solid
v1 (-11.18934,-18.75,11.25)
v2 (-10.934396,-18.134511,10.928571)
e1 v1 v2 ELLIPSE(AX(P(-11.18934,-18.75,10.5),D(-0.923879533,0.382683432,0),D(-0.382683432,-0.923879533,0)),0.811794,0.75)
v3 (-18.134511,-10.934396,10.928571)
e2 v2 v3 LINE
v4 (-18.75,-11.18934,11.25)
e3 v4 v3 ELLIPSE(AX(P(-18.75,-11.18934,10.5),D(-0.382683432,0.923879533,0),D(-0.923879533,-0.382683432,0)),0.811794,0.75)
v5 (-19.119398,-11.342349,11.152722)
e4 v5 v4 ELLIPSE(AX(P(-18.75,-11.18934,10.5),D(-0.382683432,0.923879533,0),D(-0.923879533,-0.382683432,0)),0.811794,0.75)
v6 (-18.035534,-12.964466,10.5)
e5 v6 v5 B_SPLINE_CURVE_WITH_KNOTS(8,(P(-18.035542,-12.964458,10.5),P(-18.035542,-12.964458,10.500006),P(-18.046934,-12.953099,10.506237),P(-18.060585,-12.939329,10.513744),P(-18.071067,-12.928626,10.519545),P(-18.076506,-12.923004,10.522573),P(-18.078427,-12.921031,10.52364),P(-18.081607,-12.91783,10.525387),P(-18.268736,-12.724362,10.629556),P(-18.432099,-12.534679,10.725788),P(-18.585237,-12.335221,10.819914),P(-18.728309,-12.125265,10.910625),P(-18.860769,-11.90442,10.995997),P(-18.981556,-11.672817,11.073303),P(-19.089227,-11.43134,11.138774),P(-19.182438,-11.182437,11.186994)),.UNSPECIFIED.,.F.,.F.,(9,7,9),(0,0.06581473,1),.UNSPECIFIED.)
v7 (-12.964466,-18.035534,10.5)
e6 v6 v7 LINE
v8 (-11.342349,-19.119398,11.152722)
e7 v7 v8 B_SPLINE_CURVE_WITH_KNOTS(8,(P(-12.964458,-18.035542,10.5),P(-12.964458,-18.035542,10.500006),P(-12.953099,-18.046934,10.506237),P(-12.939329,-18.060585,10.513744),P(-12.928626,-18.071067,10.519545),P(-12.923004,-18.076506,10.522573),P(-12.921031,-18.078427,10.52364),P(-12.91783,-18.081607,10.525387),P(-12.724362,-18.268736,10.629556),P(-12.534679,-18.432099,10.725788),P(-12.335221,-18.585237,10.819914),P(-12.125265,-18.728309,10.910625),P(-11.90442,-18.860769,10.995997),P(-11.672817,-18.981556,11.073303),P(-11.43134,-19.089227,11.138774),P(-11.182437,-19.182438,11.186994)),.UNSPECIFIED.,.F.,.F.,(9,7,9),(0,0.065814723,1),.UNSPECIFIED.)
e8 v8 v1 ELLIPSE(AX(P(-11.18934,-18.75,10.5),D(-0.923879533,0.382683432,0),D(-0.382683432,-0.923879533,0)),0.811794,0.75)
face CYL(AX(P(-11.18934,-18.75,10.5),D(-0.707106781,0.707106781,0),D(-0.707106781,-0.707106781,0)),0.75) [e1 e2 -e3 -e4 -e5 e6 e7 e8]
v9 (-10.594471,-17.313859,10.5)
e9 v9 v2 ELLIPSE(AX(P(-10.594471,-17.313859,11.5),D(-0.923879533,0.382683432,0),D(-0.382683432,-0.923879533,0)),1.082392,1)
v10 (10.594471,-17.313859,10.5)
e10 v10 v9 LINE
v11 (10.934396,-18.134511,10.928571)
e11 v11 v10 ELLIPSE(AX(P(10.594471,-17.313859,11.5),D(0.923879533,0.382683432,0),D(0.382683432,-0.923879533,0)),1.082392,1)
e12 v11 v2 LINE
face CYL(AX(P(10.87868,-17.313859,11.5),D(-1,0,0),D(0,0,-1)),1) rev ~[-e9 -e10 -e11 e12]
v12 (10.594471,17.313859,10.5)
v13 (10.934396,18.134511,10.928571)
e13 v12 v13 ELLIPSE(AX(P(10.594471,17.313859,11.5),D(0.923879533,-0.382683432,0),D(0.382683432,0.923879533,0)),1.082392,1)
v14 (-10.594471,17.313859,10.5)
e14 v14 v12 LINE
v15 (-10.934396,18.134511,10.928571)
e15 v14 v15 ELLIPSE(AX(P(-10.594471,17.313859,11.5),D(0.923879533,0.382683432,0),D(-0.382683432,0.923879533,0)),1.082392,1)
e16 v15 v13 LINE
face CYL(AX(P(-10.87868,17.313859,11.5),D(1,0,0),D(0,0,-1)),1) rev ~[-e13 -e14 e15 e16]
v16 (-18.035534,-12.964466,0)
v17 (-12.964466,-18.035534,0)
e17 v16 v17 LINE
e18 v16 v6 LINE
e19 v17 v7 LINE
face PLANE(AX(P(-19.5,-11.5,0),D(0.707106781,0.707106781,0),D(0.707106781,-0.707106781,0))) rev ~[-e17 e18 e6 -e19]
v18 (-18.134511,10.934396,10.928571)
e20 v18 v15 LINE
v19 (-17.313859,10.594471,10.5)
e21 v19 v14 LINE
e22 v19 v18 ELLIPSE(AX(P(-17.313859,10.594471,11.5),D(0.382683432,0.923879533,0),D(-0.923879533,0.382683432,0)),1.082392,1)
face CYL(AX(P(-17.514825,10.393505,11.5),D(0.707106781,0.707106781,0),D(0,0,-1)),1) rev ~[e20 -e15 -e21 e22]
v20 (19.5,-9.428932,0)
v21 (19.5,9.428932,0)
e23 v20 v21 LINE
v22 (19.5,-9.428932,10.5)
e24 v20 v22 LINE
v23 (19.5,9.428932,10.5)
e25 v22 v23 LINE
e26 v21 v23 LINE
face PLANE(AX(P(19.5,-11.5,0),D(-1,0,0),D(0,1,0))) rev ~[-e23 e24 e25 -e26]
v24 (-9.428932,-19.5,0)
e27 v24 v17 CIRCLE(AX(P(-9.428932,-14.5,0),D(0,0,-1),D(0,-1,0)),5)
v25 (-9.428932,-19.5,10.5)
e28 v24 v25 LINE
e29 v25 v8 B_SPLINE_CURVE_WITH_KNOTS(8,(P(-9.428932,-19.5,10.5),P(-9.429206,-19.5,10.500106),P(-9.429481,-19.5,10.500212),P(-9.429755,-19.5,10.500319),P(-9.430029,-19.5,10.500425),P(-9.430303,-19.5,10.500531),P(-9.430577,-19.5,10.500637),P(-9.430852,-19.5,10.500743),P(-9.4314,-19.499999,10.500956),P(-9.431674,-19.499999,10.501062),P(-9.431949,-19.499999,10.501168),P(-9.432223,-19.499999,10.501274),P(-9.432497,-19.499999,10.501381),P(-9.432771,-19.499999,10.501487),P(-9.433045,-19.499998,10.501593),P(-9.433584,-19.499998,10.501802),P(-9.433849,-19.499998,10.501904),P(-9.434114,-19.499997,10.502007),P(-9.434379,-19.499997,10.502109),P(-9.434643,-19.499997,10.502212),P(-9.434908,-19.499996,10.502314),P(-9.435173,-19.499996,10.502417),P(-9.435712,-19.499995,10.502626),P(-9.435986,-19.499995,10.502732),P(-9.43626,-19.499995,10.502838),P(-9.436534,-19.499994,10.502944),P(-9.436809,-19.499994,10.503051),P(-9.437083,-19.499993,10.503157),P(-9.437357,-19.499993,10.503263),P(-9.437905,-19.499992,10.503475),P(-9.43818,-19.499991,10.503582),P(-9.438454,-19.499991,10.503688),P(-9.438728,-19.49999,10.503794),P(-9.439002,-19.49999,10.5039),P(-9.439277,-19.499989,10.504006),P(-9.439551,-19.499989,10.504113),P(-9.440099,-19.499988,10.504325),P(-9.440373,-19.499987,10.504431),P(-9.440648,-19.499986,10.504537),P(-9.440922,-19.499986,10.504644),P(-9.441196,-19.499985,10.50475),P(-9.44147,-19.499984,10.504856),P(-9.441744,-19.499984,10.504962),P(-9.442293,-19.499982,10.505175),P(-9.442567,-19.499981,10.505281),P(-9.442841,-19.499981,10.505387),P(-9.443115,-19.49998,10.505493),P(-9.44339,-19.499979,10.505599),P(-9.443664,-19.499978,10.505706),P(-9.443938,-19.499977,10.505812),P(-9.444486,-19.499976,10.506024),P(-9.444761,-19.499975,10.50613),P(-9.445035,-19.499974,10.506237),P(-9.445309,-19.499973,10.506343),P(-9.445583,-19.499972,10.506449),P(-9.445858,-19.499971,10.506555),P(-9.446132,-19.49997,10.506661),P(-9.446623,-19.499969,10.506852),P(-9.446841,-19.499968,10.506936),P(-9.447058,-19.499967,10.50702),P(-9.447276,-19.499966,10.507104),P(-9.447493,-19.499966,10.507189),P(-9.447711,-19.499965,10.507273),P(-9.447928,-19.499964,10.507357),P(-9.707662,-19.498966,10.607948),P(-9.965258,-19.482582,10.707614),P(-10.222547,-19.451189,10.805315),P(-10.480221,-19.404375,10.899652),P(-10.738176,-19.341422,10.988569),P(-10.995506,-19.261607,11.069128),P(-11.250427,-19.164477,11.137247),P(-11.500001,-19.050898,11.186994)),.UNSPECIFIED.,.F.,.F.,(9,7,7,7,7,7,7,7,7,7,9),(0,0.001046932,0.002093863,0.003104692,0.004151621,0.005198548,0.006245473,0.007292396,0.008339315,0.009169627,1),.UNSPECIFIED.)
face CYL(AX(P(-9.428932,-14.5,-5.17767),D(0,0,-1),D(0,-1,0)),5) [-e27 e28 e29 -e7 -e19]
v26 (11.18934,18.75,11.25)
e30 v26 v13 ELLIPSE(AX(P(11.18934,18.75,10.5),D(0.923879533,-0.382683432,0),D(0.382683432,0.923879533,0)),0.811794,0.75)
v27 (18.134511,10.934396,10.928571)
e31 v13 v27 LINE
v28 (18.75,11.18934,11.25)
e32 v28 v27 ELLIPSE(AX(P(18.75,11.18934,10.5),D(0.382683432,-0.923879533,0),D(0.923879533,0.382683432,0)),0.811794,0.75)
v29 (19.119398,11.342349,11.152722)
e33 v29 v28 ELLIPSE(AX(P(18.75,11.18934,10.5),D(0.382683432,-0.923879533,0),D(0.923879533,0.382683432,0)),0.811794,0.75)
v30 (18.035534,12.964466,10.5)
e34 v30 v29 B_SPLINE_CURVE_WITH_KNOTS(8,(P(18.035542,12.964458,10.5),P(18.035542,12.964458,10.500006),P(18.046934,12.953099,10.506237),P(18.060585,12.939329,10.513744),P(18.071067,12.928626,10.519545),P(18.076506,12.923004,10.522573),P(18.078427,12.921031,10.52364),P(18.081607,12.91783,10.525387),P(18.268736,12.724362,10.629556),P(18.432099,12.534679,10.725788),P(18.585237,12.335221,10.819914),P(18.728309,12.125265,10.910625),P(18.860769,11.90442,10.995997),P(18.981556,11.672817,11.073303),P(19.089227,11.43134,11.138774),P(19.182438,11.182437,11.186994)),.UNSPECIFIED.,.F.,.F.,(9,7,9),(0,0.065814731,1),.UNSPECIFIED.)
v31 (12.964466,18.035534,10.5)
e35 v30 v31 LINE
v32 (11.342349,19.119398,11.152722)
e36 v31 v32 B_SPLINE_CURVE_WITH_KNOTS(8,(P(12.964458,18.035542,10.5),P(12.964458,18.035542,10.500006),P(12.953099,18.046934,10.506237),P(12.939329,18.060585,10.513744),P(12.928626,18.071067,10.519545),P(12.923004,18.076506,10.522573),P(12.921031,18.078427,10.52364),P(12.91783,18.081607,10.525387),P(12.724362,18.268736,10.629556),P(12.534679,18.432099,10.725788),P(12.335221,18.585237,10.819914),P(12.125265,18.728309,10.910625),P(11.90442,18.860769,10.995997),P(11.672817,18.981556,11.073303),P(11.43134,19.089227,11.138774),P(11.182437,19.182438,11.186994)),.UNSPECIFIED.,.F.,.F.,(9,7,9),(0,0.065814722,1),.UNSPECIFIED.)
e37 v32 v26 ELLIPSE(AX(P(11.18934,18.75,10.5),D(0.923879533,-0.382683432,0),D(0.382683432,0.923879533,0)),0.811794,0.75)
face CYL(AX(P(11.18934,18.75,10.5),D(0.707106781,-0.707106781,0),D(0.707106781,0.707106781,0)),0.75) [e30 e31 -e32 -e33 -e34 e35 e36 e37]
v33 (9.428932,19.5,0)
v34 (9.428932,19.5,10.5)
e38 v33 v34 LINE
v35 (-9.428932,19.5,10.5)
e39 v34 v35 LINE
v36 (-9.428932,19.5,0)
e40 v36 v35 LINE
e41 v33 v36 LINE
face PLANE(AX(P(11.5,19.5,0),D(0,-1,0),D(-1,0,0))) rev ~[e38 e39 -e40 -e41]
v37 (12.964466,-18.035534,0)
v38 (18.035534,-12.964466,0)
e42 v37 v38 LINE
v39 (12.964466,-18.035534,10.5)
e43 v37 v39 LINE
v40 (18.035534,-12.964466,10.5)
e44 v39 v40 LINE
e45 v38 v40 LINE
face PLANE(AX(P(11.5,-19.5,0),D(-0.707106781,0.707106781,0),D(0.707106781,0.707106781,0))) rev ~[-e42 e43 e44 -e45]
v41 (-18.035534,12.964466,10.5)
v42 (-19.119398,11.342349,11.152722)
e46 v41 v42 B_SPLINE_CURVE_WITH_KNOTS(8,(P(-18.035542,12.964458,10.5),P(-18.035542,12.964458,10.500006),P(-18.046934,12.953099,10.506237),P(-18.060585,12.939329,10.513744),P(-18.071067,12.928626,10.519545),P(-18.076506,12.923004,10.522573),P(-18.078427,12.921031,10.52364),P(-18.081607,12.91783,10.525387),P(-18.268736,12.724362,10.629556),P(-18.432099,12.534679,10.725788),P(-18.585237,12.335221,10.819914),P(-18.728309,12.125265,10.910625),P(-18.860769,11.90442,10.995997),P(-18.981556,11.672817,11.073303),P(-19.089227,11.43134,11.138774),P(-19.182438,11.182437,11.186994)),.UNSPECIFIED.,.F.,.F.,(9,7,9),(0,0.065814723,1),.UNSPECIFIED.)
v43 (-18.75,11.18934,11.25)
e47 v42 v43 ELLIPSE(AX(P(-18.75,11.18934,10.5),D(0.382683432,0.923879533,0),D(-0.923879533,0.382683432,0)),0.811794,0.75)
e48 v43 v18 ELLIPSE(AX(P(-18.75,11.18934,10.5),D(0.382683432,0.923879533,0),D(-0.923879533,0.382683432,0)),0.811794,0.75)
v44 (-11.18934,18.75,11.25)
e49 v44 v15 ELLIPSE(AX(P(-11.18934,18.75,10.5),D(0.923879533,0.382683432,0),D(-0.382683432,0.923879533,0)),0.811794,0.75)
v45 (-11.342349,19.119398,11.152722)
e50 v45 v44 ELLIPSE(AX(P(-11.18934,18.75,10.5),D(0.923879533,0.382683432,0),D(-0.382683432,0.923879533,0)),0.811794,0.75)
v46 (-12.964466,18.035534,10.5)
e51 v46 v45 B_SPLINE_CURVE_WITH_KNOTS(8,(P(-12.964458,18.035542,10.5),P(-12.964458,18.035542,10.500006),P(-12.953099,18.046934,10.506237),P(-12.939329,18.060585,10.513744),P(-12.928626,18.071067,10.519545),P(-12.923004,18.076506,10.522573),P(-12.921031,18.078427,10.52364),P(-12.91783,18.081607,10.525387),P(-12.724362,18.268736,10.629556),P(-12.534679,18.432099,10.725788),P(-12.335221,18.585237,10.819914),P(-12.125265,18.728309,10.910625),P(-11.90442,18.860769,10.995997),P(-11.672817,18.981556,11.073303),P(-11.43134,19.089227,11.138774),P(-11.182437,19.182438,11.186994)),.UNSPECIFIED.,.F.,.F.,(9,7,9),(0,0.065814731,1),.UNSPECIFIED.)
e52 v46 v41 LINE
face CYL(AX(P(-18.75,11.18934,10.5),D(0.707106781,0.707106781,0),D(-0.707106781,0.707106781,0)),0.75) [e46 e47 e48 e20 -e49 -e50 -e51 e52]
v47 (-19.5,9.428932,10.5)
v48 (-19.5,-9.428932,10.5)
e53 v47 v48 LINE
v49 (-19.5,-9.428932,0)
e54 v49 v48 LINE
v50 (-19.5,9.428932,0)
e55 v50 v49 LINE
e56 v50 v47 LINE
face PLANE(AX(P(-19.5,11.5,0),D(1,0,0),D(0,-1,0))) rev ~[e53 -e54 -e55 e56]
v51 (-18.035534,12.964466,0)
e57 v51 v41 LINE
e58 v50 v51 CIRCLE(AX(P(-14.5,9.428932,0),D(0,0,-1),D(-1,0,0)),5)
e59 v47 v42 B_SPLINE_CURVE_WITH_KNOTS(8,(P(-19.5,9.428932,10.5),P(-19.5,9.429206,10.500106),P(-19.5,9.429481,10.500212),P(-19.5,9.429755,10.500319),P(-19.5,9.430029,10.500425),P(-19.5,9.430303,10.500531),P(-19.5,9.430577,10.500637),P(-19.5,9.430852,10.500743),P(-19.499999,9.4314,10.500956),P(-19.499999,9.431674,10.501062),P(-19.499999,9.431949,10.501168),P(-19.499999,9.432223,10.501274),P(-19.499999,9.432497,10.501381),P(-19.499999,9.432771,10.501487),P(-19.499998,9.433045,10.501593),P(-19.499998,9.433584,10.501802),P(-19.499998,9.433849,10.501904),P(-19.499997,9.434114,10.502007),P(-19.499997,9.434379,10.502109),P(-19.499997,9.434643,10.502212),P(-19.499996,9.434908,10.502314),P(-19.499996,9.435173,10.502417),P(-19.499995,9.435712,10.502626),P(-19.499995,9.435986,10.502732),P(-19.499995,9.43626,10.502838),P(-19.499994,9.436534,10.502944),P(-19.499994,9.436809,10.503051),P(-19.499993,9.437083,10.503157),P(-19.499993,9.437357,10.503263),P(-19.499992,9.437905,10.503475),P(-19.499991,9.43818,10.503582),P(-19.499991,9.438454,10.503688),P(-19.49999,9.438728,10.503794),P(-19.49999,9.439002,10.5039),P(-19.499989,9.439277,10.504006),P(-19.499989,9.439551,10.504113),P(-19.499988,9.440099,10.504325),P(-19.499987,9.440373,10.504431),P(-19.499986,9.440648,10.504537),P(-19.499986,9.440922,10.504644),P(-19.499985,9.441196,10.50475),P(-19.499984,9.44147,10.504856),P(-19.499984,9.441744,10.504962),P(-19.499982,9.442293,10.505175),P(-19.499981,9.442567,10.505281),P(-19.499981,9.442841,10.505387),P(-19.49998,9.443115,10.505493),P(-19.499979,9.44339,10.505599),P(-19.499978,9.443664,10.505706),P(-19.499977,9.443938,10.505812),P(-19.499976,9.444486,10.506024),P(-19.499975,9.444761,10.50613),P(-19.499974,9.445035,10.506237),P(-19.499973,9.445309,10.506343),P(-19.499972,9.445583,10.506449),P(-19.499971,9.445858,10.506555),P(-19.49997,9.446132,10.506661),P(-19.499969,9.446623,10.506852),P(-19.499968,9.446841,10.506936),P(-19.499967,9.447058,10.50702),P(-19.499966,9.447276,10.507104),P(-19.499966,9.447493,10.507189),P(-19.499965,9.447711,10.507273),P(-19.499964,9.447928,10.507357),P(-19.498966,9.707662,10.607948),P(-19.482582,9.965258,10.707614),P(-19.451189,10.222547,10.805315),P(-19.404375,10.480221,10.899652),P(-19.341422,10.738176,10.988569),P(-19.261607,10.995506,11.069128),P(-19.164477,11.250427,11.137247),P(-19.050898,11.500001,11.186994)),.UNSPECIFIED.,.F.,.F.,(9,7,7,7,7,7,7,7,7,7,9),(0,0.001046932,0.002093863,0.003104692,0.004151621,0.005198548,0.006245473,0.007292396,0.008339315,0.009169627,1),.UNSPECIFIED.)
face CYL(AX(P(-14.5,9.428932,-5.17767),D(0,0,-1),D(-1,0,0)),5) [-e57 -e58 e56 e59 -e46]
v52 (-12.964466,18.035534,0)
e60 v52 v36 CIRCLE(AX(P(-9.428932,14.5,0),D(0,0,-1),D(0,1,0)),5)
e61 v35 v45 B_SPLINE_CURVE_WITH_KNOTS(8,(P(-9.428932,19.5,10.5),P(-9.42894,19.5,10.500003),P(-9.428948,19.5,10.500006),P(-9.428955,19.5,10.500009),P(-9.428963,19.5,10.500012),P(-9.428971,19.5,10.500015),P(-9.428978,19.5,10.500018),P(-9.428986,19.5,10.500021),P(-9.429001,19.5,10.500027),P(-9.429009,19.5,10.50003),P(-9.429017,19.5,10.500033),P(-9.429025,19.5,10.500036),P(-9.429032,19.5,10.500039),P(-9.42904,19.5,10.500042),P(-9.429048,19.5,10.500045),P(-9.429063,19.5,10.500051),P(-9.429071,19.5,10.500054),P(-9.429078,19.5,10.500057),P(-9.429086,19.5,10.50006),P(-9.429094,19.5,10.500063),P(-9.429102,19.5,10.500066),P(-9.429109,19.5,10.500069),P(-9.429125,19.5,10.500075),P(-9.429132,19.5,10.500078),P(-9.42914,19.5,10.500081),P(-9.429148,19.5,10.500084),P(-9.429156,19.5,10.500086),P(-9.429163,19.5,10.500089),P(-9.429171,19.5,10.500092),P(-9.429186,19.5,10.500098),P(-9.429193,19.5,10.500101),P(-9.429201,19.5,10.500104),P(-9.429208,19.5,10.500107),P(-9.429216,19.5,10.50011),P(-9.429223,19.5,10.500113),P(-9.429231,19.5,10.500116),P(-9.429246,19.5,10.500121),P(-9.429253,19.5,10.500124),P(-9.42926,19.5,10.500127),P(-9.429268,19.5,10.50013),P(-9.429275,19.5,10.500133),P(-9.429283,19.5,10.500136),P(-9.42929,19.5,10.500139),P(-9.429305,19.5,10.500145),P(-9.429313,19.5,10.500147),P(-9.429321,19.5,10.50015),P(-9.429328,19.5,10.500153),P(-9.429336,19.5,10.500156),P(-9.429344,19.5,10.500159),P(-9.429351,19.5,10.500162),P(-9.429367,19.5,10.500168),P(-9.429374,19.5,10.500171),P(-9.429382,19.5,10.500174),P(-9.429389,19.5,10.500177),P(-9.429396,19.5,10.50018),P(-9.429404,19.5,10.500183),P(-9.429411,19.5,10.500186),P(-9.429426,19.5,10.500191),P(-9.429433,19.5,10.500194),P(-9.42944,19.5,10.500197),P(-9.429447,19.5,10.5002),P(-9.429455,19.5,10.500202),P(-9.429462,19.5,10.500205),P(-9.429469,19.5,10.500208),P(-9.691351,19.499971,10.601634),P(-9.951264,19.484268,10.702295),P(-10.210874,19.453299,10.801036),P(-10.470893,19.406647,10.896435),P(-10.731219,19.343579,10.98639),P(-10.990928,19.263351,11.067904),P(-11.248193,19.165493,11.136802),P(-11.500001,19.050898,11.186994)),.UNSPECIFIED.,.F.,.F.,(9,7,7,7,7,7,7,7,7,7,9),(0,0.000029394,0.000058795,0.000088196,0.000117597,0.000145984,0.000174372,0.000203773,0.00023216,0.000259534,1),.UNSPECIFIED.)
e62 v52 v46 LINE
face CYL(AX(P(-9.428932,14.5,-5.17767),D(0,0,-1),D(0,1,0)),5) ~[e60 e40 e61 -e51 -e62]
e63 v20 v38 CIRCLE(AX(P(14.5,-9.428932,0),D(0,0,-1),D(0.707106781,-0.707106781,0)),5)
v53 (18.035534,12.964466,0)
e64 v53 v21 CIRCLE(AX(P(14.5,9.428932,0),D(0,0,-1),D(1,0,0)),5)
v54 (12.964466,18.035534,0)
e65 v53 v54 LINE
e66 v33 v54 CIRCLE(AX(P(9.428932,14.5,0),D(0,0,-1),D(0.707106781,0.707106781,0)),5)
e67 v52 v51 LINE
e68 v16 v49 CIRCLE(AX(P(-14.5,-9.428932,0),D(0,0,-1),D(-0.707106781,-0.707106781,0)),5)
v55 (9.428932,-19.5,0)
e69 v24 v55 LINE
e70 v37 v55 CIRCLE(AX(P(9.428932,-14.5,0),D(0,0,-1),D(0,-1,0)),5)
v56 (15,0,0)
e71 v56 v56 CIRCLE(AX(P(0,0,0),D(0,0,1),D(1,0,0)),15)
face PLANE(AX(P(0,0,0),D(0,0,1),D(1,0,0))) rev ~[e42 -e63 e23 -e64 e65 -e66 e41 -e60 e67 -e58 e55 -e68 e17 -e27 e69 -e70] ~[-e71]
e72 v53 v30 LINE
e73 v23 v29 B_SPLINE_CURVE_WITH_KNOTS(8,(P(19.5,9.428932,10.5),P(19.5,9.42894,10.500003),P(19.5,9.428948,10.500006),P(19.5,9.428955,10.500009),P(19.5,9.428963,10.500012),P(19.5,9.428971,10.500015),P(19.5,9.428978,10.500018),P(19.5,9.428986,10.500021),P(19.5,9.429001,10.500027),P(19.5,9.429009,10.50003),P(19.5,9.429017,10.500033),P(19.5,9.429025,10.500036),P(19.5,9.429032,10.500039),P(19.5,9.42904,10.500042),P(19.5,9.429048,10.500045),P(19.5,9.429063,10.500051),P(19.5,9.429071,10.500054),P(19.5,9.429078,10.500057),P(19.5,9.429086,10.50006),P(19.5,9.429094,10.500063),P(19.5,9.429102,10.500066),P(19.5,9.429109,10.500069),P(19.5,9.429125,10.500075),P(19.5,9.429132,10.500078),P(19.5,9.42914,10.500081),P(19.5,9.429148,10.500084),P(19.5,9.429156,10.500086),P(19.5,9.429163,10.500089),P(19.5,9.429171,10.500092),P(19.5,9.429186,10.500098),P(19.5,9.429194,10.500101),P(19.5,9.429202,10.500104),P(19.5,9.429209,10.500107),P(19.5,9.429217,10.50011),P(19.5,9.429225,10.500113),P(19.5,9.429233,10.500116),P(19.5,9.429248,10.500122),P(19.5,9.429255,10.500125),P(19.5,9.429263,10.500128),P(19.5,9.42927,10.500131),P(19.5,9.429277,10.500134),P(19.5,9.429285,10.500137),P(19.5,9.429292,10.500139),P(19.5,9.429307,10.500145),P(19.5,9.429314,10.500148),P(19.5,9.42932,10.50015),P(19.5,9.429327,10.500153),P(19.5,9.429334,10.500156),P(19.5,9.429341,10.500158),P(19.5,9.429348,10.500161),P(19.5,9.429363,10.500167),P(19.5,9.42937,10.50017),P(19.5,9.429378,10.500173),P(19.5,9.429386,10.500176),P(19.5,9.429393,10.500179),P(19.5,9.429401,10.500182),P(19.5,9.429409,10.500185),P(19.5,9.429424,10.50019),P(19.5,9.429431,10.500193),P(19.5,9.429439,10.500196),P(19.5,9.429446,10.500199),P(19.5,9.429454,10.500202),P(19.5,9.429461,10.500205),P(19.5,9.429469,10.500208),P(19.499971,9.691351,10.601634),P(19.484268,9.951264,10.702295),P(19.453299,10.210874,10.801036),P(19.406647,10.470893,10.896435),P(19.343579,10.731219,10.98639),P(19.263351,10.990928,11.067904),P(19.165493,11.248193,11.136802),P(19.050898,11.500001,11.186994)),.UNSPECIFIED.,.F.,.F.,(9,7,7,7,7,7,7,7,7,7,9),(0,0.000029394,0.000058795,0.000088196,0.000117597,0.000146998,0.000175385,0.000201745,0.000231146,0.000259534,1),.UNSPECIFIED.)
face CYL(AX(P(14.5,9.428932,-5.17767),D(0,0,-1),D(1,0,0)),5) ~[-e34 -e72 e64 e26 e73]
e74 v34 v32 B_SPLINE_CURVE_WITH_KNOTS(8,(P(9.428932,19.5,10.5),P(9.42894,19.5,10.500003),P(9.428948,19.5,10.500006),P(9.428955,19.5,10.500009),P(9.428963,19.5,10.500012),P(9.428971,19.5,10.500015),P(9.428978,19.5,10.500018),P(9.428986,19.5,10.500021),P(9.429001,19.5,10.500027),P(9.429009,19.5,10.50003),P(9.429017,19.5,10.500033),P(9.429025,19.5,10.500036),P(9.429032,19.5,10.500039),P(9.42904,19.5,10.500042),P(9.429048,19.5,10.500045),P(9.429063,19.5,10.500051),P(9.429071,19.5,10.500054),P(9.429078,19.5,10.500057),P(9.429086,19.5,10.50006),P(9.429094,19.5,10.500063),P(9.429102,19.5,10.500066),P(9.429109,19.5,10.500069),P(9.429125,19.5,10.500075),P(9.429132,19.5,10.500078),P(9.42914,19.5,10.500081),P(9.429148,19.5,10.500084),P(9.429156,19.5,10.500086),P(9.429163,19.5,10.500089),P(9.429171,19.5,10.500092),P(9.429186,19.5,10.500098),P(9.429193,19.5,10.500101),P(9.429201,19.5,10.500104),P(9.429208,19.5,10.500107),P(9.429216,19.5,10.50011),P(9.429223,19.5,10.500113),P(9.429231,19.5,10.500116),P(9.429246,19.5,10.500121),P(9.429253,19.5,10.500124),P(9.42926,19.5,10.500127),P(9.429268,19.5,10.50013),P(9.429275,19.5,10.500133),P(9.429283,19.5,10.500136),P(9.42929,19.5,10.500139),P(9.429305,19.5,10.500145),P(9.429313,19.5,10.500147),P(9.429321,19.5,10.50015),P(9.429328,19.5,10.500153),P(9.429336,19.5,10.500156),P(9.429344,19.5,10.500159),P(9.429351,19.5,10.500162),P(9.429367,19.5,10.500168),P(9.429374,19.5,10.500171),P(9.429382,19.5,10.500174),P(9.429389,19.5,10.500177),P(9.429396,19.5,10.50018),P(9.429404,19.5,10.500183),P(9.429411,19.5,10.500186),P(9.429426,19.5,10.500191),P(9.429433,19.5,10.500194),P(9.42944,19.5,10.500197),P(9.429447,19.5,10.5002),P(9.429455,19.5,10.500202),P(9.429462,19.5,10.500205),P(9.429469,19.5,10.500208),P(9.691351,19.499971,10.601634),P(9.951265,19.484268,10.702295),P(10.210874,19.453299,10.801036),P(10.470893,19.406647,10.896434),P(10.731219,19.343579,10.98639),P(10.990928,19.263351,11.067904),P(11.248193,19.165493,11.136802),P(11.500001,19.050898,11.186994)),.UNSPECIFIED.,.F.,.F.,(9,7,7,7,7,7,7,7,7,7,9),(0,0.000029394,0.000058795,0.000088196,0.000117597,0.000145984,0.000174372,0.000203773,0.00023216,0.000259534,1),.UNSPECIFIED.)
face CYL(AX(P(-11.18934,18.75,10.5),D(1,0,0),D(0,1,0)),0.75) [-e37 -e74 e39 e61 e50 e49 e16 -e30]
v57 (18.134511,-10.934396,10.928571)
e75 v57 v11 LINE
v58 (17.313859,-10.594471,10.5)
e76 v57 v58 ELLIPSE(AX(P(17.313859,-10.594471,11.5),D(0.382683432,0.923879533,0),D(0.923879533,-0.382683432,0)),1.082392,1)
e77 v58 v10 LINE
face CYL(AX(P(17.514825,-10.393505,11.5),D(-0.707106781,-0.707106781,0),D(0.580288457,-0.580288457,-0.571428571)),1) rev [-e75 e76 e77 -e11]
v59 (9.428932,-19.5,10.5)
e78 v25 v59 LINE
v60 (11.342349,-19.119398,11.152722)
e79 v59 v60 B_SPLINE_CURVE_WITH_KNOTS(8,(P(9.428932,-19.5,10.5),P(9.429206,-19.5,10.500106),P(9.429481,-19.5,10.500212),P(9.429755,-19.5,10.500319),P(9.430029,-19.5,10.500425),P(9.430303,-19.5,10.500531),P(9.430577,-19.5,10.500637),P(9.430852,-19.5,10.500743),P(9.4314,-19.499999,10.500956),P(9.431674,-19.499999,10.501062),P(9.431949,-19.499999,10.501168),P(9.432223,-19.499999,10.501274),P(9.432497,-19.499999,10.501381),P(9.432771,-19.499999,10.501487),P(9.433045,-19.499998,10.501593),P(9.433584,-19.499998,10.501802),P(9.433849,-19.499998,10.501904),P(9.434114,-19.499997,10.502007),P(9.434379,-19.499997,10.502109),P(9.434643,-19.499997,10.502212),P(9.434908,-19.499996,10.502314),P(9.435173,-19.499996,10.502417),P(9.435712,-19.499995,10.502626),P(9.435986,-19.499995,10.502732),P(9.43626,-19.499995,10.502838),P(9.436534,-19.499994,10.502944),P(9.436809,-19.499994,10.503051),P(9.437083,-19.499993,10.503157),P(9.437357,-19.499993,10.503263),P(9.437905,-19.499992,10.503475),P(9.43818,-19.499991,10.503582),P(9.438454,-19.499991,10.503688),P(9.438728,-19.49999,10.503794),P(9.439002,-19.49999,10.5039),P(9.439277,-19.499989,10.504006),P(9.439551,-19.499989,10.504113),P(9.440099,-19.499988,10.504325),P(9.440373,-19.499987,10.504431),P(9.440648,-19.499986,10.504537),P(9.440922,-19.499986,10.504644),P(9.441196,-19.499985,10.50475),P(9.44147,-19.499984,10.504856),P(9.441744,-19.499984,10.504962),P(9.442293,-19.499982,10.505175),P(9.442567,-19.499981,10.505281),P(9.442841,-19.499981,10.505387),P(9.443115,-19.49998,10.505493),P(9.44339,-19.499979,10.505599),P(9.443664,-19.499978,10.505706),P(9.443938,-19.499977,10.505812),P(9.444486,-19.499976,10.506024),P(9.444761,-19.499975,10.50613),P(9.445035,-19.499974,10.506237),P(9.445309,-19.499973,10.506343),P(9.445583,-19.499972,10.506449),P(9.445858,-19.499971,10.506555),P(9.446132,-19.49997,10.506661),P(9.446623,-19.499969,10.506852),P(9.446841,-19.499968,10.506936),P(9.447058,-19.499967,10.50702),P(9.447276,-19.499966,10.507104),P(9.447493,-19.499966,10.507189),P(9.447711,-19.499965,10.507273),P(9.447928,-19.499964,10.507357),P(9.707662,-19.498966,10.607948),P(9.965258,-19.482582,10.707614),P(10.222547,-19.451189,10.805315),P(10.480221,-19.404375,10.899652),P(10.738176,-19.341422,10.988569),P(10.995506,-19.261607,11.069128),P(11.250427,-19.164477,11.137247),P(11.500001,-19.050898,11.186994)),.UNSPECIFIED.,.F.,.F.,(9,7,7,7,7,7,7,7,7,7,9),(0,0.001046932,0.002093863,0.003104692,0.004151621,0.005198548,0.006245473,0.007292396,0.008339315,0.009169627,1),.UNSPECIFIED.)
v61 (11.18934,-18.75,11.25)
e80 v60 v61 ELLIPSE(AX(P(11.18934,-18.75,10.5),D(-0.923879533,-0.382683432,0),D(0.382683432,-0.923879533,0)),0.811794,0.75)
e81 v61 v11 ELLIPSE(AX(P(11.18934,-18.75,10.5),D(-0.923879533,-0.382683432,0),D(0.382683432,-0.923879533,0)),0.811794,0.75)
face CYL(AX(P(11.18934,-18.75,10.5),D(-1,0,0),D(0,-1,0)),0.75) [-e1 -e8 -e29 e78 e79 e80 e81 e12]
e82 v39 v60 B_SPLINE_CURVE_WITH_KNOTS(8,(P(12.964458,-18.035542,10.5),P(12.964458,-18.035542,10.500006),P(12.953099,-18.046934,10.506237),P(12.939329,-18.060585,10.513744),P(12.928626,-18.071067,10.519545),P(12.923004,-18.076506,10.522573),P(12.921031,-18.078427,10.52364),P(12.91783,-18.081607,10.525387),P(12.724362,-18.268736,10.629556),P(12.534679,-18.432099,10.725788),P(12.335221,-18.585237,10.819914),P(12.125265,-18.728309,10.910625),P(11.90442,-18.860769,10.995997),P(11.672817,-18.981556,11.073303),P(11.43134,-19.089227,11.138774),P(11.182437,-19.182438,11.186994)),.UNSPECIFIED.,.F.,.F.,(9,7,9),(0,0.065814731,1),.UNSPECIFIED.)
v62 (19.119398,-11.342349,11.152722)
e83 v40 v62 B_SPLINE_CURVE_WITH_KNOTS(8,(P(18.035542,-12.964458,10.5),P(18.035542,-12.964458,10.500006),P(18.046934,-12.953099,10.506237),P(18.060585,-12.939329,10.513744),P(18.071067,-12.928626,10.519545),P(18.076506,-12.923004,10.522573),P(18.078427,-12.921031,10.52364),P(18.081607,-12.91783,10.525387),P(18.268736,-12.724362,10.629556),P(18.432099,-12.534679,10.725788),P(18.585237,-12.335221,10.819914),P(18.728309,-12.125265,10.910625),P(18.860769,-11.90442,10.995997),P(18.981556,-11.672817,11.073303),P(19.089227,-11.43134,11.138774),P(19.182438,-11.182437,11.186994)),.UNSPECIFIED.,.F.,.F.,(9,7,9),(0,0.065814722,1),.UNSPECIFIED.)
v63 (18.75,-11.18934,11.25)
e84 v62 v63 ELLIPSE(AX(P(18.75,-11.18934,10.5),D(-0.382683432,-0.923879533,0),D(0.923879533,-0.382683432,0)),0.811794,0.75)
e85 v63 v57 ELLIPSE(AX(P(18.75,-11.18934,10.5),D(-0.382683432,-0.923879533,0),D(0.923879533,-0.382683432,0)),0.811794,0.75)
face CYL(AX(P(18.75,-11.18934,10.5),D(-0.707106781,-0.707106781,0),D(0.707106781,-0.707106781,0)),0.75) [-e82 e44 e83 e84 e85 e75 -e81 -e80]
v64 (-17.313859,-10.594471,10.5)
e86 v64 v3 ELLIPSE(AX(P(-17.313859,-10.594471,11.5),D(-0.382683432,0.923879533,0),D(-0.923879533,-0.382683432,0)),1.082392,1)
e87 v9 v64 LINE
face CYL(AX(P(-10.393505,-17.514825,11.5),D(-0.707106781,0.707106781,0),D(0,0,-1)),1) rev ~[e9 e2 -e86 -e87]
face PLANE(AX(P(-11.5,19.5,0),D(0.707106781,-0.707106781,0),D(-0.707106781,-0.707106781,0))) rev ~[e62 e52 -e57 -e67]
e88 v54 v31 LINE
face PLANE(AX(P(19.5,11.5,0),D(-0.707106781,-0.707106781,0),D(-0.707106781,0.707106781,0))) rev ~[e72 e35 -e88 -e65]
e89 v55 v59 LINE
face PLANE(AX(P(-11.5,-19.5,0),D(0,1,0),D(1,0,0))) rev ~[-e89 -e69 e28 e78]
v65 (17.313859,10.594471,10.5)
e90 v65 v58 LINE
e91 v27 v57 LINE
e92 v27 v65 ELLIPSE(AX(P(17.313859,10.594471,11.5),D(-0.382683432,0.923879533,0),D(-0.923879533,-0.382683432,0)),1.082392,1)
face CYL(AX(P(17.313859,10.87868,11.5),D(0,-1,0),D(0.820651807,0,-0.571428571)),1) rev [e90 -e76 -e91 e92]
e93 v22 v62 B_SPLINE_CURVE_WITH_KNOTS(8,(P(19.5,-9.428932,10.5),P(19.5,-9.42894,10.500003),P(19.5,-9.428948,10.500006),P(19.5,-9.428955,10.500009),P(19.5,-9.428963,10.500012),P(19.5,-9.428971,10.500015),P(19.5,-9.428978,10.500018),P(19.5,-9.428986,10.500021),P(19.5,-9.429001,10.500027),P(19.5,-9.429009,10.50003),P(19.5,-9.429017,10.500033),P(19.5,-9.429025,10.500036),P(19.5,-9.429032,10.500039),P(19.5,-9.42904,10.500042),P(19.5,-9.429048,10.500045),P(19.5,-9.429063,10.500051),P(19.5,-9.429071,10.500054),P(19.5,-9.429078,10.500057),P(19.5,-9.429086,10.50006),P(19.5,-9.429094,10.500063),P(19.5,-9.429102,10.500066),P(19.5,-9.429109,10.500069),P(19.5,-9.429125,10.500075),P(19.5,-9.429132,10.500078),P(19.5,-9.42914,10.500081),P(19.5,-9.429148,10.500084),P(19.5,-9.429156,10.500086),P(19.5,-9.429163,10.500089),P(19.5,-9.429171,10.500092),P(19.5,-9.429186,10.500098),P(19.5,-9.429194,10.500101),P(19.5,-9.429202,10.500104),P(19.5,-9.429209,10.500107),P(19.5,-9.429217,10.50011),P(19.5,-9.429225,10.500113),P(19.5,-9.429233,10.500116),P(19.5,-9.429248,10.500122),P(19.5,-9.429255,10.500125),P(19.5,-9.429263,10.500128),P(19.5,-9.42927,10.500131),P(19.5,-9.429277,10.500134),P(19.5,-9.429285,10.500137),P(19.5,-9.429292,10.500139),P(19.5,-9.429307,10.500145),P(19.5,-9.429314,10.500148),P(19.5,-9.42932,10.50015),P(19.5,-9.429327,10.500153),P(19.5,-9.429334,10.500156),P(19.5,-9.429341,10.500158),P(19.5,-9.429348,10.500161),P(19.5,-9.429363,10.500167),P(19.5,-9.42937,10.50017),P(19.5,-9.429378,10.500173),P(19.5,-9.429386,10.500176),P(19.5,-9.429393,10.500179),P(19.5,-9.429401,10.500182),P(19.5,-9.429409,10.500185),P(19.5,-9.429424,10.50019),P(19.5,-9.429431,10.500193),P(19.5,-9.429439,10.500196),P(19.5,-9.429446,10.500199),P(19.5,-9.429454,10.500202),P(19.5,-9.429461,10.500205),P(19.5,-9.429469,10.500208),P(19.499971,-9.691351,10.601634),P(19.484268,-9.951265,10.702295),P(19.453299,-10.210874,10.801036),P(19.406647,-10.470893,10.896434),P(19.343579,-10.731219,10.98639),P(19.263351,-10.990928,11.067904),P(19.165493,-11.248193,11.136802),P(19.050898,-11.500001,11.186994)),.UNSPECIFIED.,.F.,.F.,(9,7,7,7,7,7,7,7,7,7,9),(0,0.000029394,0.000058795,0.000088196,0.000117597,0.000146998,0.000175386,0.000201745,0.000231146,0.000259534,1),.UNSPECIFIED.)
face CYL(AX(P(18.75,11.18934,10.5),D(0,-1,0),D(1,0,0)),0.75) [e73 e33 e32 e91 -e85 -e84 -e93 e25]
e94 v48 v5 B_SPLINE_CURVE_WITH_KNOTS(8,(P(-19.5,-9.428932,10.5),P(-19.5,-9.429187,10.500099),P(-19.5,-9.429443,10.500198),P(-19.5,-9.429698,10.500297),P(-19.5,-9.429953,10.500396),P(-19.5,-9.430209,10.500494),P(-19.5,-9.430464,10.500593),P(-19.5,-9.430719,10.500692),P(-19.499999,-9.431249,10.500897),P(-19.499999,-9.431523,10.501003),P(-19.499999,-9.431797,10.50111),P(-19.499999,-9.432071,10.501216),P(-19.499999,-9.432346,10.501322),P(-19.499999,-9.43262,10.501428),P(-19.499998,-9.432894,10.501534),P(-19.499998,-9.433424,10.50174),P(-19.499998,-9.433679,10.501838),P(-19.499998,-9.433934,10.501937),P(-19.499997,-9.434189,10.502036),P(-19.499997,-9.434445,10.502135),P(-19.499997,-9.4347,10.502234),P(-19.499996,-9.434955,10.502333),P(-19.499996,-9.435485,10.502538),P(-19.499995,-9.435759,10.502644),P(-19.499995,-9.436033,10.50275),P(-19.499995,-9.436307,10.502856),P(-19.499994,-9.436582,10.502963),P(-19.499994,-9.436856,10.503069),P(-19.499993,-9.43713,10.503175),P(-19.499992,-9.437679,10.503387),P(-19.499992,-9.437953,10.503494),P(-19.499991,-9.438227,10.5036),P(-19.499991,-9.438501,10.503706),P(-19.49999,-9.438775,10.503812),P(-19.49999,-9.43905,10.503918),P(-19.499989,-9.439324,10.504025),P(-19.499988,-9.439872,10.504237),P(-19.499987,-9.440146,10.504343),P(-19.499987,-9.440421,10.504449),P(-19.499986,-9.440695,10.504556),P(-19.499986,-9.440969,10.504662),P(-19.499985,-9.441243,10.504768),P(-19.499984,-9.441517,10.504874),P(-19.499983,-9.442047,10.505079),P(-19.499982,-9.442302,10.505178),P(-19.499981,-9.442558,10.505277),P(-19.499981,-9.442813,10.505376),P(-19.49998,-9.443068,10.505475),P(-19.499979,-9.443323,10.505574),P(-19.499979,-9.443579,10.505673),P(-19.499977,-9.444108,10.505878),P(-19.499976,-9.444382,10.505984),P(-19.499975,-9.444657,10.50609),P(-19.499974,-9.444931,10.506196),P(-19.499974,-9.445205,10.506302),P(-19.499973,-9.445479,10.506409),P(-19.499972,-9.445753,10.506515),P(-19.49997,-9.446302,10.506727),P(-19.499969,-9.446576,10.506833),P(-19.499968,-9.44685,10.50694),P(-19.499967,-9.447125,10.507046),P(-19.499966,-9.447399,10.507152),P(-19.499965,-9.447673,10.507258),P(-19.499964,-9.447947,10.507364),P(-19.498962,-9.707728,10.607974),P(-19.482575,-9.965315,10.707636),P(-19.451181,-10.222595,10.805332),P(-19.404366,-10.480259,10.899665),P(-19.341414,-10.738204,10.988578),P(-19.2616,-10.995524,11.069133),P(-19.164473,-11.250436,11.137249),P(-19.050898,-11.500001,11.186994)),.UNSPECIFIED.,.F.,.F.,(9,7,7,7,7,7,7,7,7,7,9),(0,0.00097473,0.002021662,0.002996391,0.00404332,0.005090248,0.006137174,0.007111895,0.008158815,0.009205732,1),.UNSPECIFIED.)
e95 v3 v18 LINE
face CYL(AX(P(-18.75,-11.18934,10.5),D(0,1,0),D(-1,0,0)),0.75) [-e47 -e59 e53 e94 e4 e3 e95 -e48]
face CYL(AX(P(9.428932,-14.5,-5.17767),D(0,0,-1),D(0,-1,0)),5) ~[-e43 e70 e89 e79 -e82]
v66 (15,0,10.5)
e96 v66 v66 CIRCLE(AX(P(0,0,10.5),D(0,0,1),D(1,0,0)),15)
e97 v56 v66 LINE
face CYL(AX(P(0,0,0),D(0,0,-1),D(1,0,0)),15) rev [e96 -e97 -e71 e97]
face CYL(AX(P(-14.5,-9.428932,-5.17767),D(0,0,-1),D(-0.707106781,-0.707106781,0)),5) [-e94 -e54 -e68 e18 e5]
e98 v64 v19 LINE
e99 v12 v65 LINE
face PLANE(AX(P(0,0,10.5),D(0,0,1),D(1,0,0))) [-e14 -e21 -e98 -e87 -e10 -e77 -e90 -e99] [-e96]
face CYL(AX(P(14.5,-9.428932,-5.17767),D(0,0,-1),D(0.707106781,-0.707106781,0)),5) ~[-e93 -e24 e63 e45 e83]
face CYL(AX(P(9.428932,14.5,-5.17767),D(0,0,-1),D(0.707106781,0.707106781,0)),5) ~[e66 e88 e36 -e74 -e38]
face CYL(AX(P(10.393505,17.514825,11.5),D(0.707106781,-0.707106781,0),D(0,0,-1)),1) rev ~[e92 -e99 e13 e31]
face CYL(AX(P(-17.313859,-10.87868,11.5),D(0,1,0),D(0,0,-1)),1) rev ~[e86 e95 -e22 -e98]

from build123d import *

# Parameters (mm, degrees)
F0_R        = 15
F1_DEPTH    = 10.5
F3_R        = 0.75
F5_R        = 1
F6_T1_DEPTH = 20.8553390593


# Not quite as in the source:
# - a fillet or chamfer that OpenCascade refuses, or shapes differently, is made with other operations: its cross-section is extruded or revolved along the edge and cut away or added


with BuildPart() as f1:
    # F0 (on Top) → F1 (new body)
    with BuildSketch(Plane.XY):
        Polygon((-11.5, -19.5), (11.5, -19.5), (19.5, -11.5), (19.5, 11.5), (11.5, 19.5), (-11.5, 19.5), (-19.5, 11.5), (-19.5, -11.5), align=None)
        Circle(F0_R, mode=Mode.SUBTRACT)
    extrude(amount=F1_DEPTH)

    # F4: sweep along a path in F2
    with BuildLine(Plane.XY.offset(10.5)) as f4_path:
        Line((18.75, 11.1893398282), (18.75, -11.1893398282))
        Line((18.75, -11.1893398282), (11.1893398282, -18.75))
        Line((11.1893398282, -18.75), (-11.1893398282, -18.75))
        Line((-11.1893398282, -18.75), (-18.75, -11.1893398282))
        Line((-18.75, -11.1893398282), (-18.75, 11.1893398282))
        Line((-18.75, 11.1893398282), (-11.1893398282, 18.75))
        Line((-11.1893398282, 18.75), (11.1893398282, 18.75))
        Line((11.1893398282, 18.75), (18.75, 11.1893398282))
    # F3 (on Front) → F4 (sweep)
    with BuildSketch(Plane.XZ):
        with Locations((18.75, 10.5)):
            Circle(F3_R)
    sweep(path=f4_path.line, transition=Transition.RIGHT)

    # F5
    f5_edges = [f1.edges().sort_by_distance(p)[0] for p in [
        (18, 0, 10.5),
        (14.43934, -14.43934, 10.5),
        (0, -18, 10.5),
        (-14.43934, -14.43934, 10.5),
        (-18, 0, 10.5),
        (-14.43934, 14.43934, 10.5),
        (0, 18, 10.5),
        (14.43934, 14.43934, 10.5),
    ]]
    fillet(f5_edges, radius=F5_R)

    # F6: fillet of radius 5 on 8 edges, made by hand

    # F6_s2 → F6_t1 (cut)
    with BuildSketch(Plane.XY.offset(-5.1776695297)):
        with BuildLine():
            ThreePointArc((-18.0355339059, -12.9644660941), (-19.1193976626, -11.34234935), (-19.5, -9.4289321881))
            Line((-19.5, -9.4289321881), (-19.5, -11.5))
            Line((-19.5, -11.5), (-18.0355339059, -12.9644660941))
        make_face()
        with BuildLine():
            ThreePointArc((-9.4289321881, -19.5), (-11.34234935, -19.1193976626), (-12.9644660941, -18.0355339059))
            Line((-12.9644660941, -18.0355339059), (-11.5, -19.5))
            Line((-11.5, -19.5), (-9.4289321881, -19.5))
        make_face()
        with BuildLine():
            ThreePointArc((9.4289321881, -19.5), (11.34234935, -19.1193976626), (12.9644660941, -18.0355339059))
            Line((12.9644660941, -18.0355339059), (11.5, -19.5))
            Line((11.5, -19.5), (9.4289321881, -19.5))
        make_face()
        with BuildLine():
            ThreePointArc((18.0355339059, -12.9644660941), (19.1193976626, -11.34234935), (19.5, -9.4289321881))
            Line((19.5, -9.4289321881), (19.5, -11.5))
            Line((19.5, -11.5), (18.0355339059, -12.9644660941))
        make_face()
        with BuildLine():
            ThreePointArc((-9.4289321881, 19.5), (-11.34234935, 19.1193976626), (-12.9644660941, 18.0355339059))
            Line((-12.9644660941, 18.0355339059), (-11.5, 19.5))
            Line((-11.5, 19.5), (-9.4289321881, 19.5))
        make_face()
        with BuildLine():
            ThreePointArc((-19.5, 9.4289321881), (-19.1193976626, 11.34234935), (-18.0355339059, 12.9644660941))
            Line((-18.0355339059, 12.9644660941), (-19.5, 11.5))
            Line((-19.5, 11.5), (-19.5, 9.4289321881))
        make_face()
        with BuildLine():
            ThreePointArc((12.9644660941, 18.0355339059), (11.34234935, 19.1193976626), (9.4289321881, 19.5))
            Line((9.4289321881, 19.5), (11.5, 19.5))
            Line((11.5, 19.5), (12.9644660941, 18.0355339059))
        make_face()
        with BuildLine():
            ThreePointArc((19.5, 9.4289321881), (19.1193976626, 11.34234935), (18.0355339059, 12.9644660941))
            Line((18.0355339059, 12.9644660941), (19.5, 11.5))
            Line((19.5, 11.5), (19.5, 9.4289321881))
        make_face()
    extrude(amount=F6_T1_DEPTH, mode=Mode.SUBTRACT)


solid = f1.part
